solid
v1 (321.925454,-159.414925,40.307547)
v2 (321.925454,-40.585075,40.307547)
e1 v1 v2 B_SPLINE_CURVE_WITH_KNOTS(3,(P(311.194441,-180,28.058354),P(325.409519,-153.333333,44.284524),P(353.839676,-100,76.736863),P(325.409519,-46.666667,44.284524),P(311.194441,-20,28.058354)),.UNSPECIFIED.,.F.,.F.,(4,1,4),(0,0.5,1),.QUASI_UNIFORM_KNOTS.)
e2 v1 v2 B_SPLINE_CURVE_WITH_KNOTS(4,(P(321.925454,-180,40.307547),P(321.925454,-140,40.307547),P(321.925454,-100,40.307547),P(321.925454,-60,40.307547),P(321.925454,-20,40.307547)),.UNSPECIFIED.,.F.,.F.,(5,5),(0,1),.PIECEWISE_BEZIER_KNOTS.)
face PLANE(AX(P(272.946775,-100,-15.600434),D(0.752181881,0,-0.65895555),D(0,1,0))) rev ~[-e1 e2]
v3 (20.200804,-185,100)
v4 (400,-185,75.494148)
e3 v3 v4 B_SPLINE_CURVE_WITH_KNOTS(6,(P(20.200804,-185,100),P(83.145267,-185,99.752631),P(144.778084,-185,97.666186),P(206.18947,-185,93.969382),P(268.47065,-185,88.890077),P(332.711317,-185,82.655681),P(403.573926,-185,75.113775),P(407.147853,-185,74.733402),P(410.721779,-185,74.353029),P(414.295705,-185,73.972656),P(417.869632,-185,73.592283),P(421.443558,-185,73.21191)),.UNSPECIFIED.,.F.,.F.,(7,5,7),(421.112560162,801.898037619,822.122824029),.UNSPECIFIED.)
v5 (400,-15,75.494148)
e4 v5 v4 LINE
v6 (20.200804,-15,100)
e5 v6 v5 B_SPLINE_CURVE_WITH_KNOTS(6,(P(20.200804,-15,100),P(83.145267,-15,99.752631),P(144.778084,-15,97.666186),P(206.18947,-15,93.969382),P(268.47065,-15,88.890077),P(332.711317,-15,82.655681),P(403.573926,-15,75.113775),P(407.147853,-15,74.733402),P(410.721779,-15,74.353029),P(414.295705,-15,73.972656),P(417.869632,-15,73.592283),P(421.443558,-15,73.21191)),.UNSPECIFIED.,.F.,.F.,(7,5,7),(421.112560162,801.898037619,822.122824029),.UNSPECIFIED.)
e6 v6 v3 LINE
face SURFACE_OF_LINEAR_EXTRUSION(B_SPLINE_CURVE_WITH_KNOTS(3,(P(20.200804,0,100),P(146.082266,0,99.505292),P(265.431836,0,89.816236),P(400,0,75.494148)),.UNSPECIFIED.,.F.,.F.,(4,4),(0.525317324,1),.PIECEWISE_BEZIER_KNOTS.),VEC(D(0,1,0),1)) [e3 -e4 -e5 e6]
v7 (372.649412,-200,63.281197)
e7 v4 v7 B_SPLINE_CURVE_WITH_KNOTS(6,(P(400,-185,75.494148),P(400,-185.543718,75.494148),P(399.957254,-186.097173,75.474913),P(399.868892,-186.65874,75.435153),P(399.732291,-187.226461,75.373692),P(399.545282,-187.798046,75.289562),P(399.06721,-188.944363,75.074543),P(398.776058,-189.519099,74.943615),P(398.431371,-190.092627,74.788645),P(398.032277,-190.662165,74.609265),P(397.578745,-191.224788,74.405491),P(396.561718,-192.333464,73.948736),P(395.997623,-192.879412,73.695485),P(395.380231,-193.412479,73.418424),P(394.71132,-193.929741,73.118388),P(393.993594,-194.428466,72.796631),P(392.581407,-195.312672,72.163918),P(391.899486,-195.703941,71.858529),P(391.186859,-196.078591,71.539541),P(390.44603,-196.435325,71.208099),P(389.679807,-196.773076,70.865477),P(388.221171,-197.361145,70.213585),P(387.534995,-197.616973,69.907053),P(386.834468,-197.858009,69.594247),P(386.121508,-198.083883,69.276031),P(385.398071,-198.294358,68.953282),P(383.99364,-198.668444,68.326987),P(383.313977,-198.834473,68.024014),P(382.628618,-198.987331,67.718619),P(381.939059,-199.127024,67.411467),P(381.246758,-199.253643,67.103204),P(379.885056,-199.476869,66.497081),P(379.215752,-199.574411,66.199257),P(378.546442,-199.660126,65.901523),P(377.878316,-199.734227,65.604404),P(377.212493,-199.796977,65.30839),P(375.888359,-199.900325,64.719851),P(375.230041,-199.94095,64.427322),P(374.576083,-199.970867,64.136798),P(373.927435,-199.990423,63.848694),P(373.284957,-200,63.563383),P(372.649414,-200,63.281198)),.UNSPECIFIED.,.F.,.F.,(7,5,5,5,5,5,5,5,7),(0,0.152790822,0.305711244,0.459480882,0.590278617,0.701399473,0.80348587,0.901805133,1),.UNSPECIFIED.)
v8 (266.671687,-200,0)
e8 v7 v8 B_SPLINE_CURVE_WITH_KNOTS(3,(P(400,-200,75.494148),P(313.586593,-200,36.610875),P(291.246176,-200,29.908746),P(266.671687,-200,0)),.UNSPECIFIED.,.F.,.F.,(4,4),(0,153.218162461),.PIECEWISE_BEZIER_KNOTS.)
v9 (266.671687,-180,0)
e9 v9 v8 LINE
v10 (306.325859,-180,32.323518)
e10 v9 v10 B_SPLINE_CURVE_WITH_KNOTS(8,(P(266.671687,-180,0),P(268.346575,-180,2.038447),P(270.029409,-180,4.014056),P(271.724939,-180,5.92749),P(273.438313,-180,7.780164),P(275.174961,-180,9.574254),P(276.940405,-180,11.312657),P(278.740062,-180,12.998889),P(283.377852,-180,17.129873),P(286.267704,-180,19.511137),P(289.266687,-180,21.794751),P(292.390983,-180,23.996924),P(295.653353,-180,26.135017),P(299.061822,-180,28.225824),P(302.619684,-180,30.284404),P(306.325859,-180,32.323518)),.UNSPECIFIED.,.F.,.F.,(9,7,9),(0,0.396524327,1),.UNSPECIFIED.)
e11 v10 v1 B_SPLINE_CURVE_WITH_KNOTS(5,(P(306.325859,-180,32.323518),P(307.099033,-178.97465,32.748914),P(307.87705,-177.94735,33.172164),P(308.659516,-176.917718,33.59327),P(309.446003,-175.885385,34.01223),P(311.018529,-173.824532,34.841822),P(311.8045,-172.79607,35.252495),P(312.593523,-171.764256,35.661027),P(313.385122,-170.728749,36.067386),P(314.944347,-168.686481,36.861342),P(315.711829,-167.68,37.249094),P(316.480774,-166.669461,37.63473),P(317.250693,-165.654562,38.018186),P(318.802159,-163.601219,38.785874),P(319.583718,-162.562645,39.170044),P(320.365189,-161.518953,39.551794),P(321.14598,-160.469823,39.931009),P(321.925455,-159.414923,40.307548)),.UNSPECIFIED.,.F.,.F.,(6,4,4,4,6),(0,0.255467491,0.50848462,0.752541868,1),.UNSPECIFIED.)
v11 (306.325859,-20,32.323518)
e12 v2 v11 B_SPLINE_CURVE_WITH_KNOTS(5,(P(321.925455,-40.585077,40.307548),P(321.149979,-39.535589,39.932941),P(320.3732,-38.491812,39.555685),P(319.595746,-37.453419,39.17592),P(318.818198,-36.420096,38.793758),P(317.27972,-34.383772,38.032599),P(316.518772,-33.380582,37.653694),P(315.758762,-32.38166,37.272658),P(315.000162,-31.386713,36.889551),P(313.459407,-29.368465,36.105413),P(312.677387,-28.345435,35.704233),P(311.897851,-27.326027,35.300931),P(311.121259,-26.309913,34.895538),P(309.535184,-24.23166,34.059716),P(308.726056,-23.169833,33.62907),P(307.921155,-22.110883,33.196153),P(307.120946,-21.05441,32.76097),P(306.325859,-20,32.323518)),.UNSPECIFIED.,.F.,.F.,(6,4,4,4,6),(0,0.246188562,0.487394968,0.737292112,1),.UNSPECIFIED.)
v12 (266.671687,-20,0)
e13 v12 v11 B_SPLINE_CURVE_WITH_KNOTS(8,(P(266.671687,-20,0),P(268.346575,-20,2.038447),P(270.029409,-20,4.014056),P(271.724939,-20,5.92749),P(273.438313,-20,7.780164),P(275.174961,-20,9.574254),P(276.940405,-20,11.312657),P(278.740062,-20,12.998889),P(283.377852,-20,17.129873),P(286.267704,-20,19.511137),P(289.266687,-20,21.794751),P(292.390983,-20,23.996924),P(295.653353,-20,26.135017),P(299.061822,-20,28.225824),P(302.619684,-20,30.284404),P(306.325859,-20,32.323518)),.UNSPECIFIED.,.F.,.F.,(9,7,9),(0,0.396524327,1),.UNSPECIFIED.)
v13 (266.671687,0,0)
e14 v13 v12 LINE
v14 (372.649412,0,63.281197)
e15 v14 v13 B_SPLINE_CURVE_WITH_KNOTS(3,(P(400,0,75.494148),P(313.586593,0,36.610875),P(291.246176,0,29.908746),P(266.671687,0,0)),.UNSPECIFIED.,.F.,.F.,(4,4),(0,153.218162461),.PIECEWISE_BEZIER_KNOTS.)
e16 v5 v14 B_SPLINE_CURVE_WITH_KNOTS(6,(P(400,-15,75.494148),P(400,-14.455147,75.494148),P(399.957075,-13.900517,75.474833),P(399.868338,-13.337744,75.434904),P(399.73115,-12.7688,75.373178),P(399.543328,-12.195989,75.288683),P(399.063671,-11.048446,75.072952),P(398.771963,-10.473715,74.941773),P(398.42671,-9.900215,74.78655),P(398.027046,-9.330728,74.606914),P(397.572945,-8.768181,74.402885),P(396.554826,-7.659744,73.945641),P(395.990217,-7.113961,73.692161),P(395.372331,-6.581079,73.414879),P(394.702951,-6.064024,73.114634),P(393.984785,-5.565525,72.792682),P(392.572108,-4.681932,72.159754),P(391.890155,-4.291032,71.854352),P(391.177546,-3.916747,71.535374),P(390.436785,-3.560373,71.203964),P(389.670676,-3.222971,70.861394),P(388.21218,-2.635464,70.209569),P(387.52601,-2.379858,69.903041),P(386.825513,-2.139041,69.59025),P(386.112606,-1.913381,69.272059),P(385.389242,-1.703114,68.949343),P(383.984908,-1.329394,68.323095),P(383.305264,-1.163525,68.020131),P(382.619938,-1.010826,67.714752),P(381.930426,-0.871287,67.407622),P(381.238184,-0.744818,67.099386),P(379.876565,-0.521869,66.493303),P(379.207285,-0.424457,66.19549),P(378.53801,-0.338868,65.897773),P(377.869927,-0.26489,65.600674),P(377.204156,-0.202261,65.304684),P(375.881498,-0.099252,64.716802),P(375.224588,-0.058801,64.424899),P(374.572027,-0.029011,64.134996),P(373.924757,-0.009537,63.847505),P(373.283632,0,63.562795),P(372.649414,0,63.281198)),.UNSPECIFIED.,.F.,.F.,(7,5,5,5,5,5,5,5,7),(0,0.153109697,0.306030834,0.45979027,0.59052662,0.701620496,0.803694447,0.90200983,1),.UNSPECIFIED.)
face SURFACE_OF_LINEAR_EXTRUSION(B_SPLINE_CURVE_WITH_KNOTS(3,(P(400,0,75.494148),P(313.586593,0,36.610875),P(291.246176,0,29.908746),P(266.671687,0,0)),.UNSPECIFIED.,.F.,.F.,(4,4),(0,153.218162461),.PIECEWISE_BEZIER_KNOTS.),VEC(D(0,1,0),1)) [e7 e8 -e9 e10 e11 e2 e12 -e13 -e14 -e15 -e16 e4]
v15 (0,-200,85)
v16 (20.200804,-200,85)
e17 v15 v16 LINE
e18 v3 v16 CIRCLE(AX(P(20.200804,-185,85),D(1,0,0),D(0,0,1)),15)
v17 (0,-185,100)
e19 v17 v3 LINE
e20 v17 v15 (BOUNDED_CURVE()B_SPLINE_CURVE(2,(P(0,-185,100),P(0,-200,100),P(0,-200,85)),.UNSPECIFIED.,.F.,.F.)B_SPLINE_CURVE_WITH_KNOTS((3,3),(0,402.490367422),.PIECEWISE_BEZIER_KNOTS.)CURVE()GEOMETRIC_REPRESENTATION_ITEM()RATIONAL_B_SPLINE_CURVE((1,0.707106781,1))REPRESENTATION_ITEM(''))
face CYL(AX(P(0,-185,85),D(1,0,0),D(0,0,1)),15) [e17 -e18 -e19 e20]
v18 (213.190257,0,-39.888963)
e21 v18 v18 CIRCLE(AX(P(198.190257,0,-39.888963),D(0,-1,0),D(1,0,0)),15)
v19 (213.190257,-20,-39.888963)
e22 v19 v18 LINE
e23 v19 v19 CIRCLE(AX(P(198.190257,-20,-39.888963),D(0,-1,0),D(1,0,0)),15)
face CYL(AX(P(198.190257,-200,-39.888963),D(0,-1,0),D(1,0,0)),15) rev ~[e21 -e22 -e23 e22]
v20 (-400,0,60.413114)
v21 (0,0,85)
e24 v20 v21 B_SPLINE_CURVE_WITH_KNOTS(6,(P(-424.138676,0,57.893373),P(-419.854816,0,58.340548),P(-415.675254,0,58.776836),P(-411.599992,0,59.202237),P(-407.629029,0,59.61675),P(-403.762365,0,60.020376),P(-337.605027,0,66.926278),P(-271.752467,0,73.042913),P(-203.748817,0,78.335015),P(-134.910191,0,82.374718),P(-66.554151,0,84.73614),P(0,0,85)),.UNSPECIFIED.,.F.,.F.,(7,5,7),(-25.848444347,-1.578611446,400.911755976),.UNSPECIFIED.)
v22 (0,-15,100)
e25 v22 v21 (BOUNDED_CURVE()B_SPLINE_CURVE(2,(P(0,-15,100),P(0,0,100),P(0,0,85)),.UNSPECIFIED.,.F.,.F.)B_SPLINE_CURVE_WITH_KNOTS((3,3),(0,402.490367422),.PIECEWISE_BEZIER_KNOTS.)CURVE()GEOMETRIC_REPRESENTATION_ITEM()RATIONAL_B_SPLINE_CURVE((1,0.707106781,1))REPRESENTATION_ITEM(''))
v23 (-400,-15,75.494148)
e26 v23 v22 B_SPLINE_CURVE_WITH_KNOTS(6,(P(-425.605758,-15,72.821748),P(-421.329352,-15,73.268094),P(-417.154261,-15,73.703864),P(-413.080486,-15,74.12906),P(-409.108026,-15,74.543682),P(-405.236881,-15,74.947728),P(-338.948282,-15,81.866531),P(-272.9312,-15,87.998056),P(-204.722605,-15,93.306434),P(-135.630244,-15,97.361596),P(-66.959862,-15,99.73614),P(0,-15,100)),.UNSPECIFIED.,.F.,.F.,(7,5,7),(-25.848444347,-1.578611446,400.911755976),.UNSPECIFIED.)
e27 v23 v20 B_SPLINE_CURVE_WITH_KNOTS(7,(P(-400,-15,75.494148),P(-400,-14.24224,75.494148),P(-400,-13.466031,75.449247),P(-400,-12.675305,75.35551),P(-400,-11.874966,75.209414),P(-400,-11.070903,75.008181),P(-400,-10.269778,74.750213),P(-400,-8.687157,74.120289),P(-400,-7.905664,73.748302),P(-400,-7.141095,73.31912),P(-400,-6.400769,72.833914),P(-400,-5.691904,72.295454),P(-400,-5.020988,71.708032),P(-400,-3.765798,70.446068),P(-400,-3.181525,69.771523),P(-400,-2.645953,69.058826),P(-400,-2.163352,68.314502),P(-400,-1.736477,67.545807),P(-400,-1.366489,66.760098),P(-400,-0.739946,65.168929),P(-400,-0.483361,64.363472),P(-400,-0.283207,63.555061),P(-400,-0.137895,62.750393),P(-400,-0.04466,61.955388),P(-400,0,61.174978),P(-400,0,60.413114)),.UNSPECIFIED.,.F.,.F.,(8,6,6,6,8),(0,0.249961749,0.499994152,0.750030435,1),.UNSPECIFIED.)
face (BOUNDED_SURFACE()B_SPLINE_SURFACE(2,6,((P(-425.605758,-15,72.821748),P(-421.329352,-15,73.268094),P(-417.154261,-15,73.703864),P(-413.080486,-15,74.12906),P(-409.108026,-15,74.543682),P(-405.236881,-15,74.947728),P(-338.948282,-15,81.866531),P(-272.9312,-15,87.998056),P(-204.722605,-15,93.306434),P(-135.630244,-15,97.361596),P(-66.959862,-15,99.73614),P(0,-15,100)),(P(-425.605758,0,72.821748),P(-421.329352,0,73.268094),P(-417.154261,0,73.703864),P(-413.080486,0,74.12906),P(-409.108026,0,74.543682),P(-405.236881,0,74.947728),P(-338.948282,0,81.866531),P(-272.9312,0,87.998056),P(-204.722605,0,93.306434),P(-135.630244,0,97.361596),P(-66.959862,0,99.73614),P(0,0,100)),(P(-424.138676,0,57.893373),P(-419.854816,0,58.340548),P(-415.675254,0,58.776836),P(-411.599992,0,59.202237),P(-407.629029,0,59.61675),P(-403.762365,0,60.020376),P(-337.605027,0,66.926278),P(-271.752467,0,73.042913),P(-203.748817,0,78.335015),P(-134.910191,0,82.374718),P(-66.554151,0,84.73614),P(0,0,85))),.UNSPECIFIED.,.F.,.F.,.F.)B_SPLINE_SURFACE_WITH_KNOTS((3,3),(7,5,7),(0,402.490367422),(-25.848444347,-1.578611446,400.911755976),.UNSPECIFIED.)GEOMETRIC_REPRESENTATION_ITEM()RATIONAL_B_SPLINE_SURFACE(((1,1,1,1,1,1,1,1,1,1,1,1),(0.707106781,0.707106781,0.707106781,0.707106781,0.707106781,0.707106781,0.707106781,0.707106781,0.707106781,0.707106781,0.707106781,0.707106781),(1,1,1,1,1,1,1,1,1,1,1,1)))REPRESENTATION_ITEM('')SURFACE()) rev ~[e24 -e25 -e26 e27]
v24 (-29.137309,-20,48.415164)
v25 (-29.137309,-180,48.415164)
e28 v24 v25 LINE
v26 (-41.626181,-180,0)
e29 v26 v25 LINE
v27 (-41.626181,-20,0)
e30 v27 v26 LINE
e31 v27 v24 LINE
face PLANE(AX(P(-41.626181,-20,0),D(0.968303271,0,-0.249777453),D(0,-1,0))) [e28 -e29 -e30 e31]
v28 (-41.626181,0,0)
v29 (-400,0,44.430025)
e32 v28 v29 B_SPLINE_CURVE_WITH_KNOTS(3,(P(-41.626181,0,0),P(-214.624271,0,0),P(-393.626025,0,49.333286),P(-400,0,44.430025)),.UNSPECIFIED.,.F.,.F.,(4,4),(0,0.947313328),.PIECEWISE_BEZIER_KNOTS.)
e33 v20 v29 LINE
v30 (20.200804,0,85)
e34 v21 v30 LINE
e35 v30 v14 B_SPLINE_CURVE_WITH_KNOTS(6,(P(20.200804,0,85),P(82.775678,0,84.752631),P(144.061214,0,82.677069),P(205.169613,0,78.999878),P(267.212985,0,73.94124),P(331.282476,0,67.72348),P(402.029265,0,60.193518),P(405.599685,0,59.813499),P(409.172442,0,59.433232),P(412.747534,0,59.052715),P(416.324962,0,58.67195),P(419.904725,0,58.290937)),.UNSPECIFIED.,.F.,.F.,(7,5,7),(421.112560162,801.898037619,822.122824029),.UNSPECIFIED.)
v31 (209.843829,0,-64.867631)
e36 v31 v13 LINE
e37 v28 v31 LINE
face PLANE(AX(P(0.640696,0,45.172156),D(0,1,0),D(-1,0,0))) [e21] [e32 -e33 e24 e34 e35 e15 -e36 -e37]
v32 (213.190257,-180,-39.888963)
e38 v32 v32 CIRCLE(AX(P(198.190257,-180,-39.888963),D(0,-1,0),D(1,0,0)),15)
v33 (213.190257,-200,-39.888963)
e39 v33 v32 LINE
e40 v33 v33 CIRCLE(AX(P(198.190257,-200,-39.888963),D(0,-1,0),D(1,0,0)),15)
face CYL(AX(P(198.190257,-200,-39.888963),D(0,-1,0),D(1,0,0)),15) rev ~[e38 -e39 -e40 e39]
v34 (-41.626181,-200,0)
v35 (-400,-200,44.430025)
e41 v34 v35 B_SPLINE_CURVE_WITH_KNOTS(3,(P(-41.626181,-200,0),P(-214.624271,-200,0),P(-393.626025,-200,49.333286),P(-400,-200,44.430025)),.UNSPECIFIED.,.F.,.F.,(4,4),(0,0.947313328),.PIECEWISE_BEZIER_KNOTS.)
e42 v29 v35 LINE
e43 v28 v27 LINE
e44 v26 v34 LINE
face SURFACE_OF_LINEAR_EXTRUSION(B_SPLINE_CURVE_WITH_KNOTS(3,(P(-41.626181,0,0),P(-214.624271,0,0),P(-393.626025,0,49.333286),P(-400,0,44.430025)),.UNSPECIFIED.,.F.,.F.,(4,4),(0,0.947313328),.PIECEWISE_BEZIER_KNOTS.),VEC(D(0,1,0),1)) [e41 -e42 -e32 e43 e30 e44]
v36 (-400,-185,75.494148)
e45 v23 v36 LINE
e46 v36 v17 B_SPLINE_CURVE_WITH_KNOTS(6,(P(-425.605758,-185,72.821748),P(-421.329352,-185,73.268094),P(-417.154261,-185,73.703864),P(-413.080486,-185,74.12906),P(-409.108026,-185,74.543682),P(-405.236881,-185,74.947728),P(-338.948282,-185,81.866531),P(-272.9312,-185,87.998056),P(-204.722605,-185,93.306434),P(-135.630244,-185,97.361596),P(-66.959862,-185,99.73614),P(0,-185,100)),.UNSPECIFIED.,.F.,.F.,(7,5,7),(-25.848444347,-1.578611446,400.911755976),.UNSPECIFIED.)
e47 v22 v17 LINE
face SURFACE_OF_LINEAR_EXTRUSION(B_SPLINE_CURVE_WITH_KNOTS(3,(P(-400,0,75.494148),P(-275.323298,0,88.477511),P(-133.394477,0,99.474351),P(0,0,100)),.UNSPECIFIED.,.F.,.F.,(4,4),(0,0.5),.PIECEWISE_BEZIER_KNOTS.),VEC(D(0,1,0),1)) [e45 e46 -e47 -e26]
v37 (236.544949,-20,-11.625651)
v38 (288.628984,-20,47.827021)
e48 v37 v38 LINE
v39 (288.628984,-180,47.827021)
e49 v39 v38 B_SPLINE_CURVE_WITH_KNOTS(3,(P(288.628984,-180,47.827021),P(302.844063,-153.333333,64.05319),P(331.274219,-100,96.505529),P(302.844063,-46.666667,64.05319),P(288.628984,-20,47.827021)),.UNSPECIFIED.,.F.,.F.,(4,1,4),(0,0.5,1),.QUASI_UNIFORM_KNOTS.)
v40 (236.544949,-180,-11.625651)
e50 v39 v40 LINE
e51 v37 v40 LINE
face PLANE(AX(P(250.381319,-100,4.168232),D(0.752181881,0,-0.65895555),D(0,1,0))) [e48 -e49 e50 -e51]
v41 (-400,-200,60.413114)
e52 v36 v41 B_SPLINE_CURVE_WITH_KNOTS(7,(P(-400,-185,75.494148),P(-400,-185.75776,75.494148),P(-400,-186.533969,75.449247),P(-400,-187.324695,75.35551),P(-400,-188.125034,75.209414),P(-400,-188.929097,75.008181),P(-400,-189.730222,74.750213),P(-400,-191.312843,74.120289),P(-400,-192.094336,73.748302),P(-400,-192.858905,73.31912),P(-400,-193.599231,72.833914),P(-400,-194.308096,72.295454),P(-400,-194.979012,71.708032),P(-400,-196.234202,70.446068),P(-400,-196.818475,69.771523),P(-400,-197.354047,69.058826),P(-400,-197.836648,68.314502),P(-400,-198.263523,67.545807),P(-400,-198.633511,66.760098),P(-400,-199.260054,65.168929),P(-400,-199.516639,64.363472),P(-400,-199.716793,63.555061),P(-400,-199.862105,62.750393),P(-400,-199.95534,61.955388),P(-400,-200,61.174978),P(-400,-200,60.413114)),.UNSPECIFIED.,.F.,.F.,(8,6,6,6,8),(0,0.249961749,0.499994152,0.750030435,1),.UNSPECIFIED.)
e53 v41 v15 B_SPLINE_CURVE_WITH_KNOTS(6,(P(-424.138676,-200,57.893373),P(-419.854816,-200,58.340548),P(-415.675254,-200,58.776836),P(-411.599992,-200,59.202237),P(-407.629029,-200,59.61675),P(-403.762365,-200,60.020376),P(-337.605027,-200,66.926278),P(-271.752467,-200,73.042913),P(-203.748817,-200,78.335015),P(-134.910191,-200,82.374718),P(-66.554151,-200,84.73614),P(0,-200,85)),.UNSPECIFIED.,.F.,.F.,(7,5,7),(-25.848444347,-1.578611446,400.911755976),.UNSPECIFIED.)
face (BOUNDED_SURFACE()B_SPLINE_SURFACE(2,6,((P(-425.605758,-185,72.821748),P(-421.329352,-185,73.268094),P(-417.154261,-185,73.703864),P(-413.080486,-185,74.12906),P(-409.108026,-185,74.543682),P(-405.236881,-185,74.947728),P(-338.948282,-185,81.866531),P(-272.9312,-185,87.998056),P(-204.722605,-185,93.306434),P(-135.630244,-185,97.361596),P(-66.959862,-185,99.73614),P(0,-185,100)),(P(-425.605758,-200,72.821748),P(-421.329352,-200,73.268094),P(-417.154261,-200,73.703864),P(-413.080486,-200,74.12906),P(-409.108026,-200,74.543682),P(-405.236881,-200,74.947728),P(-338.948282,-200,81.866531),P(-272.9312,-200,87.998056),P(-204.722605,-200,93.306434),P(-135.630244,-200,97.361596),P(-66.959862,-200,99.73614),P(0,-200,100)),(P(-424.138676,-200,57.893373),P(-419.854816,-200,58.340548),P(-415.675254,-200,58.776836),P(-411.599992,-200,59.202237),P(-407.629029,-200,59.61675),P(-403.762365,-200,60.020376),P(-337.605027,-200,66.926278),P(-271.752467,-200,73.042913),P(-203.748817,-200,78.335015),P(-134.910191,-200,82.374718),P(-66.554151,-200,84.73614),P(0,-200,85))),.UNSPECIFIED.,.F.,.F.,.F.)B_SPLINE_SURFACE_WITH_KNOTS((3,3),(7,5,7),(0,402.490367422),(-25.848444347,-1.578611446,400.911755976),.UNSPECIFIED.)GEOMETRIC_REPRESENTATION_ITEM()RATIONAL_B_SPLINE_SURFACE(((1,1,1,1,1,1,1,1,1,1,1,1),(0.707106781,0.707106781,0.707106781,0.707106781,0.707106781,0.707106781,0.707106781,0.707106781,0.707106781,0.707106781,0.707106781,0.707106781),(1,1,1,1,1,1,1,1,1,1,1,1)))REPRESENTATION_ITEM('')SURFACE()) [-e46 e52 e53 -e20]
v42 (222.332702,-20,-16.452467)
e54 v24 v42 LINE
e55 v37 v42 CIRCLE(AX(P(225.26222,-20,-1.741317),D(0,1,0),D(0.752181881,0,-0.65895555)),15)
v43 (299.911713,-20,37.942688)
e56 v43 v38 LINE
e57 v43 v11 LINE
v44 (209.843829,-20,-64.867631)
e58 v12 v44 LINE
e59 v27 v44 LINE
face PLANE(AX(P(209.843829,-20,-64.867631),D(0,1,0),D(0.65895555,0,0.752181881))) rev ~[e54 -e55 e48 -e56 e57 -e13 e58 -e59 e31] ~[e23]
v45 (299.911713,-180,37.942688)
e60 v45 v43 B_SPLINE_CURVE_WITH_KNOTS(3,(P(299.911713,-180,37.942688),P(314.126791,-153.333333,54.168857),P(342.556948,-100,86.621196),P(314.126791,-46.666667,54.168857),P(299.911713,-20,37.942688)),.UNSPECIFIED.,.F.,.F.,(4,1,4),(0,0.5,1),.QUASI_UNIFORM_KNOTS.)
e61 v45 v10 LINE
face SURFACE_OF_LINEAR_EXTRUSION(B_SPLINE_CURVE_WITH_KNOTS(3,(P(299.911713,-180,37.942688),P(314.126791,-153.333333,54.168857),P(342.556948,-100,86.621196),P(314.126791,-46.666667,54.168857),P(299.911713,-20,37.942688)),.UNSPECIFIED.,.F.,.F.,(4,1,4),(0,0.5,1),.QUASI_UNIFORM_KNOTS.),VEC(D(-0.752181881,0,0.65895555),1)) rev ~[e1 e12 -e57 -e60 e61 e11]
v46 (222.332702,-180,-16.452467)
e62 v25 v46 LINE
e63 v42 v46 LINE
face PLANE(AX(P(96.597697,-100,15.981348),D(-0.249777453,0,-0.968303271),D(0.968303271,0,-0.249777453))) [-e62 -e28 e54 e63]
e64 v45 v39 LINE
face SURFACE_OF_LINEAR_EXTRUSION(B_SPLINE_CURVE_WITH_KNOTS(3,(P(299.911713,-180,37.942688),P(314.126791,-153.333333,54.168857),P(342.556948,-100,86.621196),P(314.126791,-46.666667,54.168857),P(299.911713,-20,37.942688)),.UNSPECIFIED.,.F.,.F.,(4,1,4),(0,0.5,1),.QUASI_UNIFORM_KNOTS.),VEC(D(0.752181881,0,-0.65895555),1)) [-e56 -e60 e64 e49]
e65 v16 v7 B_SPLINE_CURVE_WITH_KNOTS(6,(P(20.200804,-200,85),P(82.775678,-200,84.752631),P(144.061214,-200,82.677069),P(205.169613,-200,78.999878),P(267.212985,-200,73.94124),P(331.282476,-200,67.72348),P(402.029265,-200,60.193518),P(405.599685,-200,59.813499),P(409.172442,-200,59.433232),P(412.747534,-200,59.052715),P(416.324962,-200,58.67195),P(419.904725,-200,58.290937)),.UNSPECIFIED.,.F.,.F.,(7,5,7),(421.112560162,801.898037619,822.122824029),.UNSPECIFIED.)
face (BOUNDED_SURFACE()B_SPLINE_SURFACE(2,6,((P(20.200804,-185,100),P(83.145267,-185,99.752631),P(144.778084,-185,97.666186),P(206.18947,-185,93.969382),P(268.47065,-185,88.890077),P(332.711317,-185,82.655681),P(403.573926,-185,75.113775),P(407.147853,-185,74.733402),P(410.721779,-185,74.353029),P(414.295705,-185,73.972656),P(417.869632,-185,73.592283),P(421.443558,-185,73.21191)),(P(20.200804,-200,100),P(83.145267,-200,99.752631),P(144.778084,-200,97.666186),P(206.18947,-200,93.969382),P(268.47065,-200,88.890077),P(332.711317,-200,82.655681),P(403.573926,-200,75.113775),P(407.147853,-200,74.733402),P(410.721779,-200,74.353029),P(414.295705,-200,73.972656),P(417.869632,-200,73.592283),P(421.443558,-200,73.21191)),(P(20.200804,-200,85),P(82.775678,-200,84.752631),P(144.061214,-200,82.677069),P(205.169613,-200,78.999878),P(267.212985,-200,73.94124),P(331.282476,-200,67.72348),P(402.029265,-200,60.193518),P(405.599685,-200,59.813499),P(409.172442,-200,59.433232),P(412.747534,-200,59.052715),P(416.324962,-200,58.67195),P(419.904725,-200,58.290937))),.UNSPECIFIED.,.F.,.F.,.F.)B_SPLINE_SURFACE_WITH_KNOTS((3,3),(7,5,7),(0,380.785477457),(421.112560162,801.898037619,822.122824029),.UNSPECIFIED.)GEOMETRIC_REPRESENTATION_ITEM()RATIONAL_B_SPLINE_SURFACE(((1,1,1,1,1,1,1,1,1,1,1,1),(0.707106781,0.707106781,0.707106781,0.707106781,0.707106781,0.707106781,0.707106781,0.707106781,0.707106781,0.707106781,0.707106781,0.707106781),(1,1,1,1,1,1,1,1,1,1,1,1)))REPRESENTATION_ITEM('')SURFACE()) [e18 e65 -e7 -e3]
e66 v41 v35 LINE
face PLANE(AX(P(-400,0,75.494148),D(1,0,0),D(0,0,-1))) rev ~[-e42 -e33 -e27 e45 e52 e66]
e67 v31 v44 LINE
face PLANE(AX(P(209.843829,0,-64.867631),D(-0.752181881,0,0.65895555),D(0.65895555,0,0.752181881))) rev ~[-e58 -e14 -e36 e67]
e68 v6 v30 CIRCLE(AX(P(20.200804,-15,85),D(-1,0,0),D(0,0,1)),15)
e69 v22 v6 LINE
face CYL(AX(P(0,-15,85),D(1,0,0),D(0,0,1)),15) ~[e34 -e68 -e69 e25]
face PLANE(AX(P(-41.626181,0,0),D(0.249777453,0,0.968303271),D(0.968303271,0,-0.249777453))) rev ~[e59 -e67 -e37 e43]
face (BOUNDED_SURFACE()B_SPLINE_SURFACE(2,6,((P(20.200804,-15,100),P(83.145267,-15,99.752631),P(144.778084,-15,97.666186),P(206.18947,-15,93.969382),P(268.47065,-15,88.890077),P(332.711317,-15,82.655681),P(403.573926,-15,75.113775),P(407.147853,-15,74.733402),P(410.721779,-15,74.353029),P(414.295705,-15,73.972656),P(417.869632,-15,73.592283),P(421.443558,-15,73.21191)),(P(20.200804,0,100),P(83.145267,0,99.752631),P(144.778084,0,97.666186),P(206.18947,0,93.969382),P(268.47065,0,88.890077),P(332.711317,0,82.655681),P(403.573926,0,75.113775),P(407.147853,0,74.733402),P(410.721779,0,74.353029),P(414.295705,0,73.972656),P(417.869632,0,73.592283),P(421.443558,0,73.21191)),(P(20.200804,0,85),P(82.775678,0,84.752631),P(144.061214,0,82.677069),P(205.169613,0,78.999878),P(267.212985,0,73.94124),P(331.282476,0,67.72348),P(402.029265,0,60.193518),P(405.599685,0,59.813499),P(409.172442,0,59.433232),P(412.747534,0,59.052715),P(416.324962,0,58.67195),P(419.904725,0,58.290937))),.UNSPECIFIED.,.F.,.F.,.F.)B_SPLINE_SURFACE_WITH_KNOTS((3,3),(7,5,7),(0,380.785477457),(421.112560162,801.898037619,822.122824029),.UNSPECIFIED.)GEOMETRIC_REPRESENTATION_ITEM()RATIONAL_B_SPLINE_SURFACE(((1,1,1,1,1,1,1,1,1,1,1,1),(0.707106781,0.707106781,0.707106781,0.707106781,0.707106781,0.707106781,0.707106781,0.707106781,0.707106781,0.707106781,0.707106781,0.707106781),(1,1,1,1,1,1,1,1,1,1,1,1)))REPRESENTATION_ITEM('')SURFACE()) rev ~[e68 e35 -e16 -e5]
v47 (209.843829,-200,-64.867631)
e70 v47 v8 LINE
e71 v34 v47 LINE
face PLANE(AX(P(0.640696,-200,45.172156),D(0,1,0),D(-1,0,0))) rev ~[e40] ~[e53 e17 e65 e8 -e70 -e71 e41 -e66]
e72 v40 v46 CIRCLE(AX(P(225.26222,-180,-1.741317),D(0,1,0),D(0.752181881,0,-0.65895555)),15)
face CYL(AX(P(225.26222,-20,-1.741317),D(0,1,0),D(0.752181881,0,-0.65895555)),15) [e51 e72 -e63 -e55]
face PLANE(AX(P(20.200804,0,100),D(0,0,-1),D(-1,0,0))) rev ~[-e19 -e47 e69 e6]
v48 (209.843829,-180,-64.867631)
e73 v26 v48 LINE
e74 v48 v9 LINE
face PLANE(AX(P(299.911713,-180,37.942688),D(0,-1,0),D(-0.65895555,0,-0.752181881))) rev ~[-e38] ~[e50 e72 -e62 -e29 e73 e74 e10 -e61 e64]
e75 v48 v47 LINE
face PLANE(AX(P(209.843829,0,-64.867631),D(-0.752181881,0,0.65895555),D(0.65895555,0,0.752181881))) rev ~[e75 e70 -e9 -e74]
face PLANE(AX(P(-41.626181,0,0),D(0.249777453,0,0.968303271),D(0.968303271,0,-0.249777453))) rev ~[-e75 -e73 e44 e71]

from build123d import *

# Parameters (mm, degrees)
F1_DEPTH    = 200
F2_R        = 15
F4_DEPTH    = 15
F5_W        = 259.7017054144
F5_H        = 160
F6_DEPTH    = 50
F7_T1_DEPTH = 160
F8_R        = 15
F9_DEPTH    = 300


# Not quite as in the source:
# - a fillet or chamfer that OpenCascade refuses, or shapes differently, is made with other operations: its cross-section is extruded or revolved along the edge and cut away or added


with BuildPart() as f1:
    # F0 (on Front) → F1 (new body)
    with BuildSketch(Plane.XZ):
        with BuildLine():
            add(Edge.make_bspline(
                [(20.2008041868, 100), (146.0822657859, 99.5052919304), (265.431836351, 89.8162356005), (400, 75.4941478372)],
                knots=[0.5253173238, 0.5253173238, 0.5253173238, 0.5253173238, 1, 1, 1, 1], degree=3))
            Line((20.2008041868, 100), (0, 100))
            add(Edge.make_bspline(
                [(-400, 75.4941478372), (-275.3232982272, 88.4775108691), (-133.3944766528, 99.4743507493), (0, 100)],
                knots=[0, 0, 0, 0, 0.5, 0.5, 0.5, 0.5], degree=3))
            Line((-400, 75.4941478372), (-400, 44.4300249219))
            add(Edge.make_bspline(
                [(-41.6261814535, 0), (-214.6242707968, 0), (-393.6260249555, 49.33328574), (-400, 44.4300249219)],
                knots=[0, 0, 0, 0, 0.9473133281, 0.9473133281, 0.9473133281, 0.9473133281], degree=3))
            Line((-41.6261814535, 0), (209.8438292742, -64.8676306009))
            Line((209.8438292742, -64.8676306009), (266.6716873646, 0))
            add(Edge.make_bspline(
                [(400, 75.4941478372), (313.5865926743, 36.6108752787), (291.246175766, 29.9087464809), (266.6716873646, 0)],
                knots=[0, 0, 0, 0, 153.2181624608, 153.2181624608, 153.2181624608, 153.2181624608], degree=3))
        make_face()
    extrude(amount=F1_DEPTH)

    # F2
    f2_edges = [f1.edges().sort_by_distance(p)[0] for p in [
        (-200.289149, -200, 92.61289),
        (210.407204, -200, 92.68637),
        (-200.289149, 0, 92.61289),
        (10.100402, -200, 100),
        (10.100402, 0, 100),
        (210.407204, 0, 92.68637),
    ]]
    fillet(f2_edges, radius=F2_R)

    # F3 (on face) → F4 (cut, symmetric)
    with BuildSketch(Plane(origin=(150.8768626718, 0, -132.1770020211), x_dir=(0, 1, 0), z_dir=(0.7521818814, 0, -0.6589555503))):
        with BuildLine():
            Line((-180, 226.1682897806), (-180, 89.4854995586))
            Line((-180, 89.4854995586), (-20, 89.4854995586))
            Line((-20, 89.4854995586), (-20, 226.1682897806))
            add(Edge.make_bspline(
                [(-180, 226.1682897806), (-153.3333333333, 247.7404251695), (-100, 290.8846959472), (-46.6666666667, 247.7404251695), (-20, 226.1682897806)],
                knots=[0, 0, 0, 0, 0.5, 1, 1, 1, 1], degree=3))
        make_face()
    extrude(amount=F4_DEPTH, both=True, mode=Mode.SUBTRACT)

    # F5 (on face) → F6 (cut)
    with BuildSketch(Plane(origin=(-2.5970065182, 0, -10.0677217734), x_dir=(0.9683032706, 0, -0.2497774533), z_dir=(-0.2497774533, 0, -0.9683032706))):
        with Locations((89.5440850641, 100)):
            Rectangle(F5_W, F5_H)
    extrude(amount=-F6_DEPTH, mode=Mode.SUBTRACT)

    # F7: fillet of radius 15 on 1 edges, made by hand

    # F7_s2 → F7_t1 (cut)
    with BuildSketch(Plane.XZ.offset(20)):
        with BuildLine():
            ThreePointArc((236.54494855, -11.6256507443), (230.0859706945, -15.9445365763), (222.3327019401, -16.452467072))
            Line((222.3327019401, -16.452467072), (218.1662168076, -32.6045301468))
            Line((218.1662168076, -32.6045301468), (236.54494855, -11.6256507443))
        make_face()
    extrude(amount=F7_T1_DEPTH, mode=Mode.SUBTRACT)

    # F8 (on face) → F9 (cut)
    with BuildSketch(Plane.XZ.offset(200)):
        with Locations((198.1902569532, -39.8889631033)):
            Circle(F8_R)
    extrude(amount=-F9_DEPTH, mode=Mode.SUBTRACT)


solid = f1.part
